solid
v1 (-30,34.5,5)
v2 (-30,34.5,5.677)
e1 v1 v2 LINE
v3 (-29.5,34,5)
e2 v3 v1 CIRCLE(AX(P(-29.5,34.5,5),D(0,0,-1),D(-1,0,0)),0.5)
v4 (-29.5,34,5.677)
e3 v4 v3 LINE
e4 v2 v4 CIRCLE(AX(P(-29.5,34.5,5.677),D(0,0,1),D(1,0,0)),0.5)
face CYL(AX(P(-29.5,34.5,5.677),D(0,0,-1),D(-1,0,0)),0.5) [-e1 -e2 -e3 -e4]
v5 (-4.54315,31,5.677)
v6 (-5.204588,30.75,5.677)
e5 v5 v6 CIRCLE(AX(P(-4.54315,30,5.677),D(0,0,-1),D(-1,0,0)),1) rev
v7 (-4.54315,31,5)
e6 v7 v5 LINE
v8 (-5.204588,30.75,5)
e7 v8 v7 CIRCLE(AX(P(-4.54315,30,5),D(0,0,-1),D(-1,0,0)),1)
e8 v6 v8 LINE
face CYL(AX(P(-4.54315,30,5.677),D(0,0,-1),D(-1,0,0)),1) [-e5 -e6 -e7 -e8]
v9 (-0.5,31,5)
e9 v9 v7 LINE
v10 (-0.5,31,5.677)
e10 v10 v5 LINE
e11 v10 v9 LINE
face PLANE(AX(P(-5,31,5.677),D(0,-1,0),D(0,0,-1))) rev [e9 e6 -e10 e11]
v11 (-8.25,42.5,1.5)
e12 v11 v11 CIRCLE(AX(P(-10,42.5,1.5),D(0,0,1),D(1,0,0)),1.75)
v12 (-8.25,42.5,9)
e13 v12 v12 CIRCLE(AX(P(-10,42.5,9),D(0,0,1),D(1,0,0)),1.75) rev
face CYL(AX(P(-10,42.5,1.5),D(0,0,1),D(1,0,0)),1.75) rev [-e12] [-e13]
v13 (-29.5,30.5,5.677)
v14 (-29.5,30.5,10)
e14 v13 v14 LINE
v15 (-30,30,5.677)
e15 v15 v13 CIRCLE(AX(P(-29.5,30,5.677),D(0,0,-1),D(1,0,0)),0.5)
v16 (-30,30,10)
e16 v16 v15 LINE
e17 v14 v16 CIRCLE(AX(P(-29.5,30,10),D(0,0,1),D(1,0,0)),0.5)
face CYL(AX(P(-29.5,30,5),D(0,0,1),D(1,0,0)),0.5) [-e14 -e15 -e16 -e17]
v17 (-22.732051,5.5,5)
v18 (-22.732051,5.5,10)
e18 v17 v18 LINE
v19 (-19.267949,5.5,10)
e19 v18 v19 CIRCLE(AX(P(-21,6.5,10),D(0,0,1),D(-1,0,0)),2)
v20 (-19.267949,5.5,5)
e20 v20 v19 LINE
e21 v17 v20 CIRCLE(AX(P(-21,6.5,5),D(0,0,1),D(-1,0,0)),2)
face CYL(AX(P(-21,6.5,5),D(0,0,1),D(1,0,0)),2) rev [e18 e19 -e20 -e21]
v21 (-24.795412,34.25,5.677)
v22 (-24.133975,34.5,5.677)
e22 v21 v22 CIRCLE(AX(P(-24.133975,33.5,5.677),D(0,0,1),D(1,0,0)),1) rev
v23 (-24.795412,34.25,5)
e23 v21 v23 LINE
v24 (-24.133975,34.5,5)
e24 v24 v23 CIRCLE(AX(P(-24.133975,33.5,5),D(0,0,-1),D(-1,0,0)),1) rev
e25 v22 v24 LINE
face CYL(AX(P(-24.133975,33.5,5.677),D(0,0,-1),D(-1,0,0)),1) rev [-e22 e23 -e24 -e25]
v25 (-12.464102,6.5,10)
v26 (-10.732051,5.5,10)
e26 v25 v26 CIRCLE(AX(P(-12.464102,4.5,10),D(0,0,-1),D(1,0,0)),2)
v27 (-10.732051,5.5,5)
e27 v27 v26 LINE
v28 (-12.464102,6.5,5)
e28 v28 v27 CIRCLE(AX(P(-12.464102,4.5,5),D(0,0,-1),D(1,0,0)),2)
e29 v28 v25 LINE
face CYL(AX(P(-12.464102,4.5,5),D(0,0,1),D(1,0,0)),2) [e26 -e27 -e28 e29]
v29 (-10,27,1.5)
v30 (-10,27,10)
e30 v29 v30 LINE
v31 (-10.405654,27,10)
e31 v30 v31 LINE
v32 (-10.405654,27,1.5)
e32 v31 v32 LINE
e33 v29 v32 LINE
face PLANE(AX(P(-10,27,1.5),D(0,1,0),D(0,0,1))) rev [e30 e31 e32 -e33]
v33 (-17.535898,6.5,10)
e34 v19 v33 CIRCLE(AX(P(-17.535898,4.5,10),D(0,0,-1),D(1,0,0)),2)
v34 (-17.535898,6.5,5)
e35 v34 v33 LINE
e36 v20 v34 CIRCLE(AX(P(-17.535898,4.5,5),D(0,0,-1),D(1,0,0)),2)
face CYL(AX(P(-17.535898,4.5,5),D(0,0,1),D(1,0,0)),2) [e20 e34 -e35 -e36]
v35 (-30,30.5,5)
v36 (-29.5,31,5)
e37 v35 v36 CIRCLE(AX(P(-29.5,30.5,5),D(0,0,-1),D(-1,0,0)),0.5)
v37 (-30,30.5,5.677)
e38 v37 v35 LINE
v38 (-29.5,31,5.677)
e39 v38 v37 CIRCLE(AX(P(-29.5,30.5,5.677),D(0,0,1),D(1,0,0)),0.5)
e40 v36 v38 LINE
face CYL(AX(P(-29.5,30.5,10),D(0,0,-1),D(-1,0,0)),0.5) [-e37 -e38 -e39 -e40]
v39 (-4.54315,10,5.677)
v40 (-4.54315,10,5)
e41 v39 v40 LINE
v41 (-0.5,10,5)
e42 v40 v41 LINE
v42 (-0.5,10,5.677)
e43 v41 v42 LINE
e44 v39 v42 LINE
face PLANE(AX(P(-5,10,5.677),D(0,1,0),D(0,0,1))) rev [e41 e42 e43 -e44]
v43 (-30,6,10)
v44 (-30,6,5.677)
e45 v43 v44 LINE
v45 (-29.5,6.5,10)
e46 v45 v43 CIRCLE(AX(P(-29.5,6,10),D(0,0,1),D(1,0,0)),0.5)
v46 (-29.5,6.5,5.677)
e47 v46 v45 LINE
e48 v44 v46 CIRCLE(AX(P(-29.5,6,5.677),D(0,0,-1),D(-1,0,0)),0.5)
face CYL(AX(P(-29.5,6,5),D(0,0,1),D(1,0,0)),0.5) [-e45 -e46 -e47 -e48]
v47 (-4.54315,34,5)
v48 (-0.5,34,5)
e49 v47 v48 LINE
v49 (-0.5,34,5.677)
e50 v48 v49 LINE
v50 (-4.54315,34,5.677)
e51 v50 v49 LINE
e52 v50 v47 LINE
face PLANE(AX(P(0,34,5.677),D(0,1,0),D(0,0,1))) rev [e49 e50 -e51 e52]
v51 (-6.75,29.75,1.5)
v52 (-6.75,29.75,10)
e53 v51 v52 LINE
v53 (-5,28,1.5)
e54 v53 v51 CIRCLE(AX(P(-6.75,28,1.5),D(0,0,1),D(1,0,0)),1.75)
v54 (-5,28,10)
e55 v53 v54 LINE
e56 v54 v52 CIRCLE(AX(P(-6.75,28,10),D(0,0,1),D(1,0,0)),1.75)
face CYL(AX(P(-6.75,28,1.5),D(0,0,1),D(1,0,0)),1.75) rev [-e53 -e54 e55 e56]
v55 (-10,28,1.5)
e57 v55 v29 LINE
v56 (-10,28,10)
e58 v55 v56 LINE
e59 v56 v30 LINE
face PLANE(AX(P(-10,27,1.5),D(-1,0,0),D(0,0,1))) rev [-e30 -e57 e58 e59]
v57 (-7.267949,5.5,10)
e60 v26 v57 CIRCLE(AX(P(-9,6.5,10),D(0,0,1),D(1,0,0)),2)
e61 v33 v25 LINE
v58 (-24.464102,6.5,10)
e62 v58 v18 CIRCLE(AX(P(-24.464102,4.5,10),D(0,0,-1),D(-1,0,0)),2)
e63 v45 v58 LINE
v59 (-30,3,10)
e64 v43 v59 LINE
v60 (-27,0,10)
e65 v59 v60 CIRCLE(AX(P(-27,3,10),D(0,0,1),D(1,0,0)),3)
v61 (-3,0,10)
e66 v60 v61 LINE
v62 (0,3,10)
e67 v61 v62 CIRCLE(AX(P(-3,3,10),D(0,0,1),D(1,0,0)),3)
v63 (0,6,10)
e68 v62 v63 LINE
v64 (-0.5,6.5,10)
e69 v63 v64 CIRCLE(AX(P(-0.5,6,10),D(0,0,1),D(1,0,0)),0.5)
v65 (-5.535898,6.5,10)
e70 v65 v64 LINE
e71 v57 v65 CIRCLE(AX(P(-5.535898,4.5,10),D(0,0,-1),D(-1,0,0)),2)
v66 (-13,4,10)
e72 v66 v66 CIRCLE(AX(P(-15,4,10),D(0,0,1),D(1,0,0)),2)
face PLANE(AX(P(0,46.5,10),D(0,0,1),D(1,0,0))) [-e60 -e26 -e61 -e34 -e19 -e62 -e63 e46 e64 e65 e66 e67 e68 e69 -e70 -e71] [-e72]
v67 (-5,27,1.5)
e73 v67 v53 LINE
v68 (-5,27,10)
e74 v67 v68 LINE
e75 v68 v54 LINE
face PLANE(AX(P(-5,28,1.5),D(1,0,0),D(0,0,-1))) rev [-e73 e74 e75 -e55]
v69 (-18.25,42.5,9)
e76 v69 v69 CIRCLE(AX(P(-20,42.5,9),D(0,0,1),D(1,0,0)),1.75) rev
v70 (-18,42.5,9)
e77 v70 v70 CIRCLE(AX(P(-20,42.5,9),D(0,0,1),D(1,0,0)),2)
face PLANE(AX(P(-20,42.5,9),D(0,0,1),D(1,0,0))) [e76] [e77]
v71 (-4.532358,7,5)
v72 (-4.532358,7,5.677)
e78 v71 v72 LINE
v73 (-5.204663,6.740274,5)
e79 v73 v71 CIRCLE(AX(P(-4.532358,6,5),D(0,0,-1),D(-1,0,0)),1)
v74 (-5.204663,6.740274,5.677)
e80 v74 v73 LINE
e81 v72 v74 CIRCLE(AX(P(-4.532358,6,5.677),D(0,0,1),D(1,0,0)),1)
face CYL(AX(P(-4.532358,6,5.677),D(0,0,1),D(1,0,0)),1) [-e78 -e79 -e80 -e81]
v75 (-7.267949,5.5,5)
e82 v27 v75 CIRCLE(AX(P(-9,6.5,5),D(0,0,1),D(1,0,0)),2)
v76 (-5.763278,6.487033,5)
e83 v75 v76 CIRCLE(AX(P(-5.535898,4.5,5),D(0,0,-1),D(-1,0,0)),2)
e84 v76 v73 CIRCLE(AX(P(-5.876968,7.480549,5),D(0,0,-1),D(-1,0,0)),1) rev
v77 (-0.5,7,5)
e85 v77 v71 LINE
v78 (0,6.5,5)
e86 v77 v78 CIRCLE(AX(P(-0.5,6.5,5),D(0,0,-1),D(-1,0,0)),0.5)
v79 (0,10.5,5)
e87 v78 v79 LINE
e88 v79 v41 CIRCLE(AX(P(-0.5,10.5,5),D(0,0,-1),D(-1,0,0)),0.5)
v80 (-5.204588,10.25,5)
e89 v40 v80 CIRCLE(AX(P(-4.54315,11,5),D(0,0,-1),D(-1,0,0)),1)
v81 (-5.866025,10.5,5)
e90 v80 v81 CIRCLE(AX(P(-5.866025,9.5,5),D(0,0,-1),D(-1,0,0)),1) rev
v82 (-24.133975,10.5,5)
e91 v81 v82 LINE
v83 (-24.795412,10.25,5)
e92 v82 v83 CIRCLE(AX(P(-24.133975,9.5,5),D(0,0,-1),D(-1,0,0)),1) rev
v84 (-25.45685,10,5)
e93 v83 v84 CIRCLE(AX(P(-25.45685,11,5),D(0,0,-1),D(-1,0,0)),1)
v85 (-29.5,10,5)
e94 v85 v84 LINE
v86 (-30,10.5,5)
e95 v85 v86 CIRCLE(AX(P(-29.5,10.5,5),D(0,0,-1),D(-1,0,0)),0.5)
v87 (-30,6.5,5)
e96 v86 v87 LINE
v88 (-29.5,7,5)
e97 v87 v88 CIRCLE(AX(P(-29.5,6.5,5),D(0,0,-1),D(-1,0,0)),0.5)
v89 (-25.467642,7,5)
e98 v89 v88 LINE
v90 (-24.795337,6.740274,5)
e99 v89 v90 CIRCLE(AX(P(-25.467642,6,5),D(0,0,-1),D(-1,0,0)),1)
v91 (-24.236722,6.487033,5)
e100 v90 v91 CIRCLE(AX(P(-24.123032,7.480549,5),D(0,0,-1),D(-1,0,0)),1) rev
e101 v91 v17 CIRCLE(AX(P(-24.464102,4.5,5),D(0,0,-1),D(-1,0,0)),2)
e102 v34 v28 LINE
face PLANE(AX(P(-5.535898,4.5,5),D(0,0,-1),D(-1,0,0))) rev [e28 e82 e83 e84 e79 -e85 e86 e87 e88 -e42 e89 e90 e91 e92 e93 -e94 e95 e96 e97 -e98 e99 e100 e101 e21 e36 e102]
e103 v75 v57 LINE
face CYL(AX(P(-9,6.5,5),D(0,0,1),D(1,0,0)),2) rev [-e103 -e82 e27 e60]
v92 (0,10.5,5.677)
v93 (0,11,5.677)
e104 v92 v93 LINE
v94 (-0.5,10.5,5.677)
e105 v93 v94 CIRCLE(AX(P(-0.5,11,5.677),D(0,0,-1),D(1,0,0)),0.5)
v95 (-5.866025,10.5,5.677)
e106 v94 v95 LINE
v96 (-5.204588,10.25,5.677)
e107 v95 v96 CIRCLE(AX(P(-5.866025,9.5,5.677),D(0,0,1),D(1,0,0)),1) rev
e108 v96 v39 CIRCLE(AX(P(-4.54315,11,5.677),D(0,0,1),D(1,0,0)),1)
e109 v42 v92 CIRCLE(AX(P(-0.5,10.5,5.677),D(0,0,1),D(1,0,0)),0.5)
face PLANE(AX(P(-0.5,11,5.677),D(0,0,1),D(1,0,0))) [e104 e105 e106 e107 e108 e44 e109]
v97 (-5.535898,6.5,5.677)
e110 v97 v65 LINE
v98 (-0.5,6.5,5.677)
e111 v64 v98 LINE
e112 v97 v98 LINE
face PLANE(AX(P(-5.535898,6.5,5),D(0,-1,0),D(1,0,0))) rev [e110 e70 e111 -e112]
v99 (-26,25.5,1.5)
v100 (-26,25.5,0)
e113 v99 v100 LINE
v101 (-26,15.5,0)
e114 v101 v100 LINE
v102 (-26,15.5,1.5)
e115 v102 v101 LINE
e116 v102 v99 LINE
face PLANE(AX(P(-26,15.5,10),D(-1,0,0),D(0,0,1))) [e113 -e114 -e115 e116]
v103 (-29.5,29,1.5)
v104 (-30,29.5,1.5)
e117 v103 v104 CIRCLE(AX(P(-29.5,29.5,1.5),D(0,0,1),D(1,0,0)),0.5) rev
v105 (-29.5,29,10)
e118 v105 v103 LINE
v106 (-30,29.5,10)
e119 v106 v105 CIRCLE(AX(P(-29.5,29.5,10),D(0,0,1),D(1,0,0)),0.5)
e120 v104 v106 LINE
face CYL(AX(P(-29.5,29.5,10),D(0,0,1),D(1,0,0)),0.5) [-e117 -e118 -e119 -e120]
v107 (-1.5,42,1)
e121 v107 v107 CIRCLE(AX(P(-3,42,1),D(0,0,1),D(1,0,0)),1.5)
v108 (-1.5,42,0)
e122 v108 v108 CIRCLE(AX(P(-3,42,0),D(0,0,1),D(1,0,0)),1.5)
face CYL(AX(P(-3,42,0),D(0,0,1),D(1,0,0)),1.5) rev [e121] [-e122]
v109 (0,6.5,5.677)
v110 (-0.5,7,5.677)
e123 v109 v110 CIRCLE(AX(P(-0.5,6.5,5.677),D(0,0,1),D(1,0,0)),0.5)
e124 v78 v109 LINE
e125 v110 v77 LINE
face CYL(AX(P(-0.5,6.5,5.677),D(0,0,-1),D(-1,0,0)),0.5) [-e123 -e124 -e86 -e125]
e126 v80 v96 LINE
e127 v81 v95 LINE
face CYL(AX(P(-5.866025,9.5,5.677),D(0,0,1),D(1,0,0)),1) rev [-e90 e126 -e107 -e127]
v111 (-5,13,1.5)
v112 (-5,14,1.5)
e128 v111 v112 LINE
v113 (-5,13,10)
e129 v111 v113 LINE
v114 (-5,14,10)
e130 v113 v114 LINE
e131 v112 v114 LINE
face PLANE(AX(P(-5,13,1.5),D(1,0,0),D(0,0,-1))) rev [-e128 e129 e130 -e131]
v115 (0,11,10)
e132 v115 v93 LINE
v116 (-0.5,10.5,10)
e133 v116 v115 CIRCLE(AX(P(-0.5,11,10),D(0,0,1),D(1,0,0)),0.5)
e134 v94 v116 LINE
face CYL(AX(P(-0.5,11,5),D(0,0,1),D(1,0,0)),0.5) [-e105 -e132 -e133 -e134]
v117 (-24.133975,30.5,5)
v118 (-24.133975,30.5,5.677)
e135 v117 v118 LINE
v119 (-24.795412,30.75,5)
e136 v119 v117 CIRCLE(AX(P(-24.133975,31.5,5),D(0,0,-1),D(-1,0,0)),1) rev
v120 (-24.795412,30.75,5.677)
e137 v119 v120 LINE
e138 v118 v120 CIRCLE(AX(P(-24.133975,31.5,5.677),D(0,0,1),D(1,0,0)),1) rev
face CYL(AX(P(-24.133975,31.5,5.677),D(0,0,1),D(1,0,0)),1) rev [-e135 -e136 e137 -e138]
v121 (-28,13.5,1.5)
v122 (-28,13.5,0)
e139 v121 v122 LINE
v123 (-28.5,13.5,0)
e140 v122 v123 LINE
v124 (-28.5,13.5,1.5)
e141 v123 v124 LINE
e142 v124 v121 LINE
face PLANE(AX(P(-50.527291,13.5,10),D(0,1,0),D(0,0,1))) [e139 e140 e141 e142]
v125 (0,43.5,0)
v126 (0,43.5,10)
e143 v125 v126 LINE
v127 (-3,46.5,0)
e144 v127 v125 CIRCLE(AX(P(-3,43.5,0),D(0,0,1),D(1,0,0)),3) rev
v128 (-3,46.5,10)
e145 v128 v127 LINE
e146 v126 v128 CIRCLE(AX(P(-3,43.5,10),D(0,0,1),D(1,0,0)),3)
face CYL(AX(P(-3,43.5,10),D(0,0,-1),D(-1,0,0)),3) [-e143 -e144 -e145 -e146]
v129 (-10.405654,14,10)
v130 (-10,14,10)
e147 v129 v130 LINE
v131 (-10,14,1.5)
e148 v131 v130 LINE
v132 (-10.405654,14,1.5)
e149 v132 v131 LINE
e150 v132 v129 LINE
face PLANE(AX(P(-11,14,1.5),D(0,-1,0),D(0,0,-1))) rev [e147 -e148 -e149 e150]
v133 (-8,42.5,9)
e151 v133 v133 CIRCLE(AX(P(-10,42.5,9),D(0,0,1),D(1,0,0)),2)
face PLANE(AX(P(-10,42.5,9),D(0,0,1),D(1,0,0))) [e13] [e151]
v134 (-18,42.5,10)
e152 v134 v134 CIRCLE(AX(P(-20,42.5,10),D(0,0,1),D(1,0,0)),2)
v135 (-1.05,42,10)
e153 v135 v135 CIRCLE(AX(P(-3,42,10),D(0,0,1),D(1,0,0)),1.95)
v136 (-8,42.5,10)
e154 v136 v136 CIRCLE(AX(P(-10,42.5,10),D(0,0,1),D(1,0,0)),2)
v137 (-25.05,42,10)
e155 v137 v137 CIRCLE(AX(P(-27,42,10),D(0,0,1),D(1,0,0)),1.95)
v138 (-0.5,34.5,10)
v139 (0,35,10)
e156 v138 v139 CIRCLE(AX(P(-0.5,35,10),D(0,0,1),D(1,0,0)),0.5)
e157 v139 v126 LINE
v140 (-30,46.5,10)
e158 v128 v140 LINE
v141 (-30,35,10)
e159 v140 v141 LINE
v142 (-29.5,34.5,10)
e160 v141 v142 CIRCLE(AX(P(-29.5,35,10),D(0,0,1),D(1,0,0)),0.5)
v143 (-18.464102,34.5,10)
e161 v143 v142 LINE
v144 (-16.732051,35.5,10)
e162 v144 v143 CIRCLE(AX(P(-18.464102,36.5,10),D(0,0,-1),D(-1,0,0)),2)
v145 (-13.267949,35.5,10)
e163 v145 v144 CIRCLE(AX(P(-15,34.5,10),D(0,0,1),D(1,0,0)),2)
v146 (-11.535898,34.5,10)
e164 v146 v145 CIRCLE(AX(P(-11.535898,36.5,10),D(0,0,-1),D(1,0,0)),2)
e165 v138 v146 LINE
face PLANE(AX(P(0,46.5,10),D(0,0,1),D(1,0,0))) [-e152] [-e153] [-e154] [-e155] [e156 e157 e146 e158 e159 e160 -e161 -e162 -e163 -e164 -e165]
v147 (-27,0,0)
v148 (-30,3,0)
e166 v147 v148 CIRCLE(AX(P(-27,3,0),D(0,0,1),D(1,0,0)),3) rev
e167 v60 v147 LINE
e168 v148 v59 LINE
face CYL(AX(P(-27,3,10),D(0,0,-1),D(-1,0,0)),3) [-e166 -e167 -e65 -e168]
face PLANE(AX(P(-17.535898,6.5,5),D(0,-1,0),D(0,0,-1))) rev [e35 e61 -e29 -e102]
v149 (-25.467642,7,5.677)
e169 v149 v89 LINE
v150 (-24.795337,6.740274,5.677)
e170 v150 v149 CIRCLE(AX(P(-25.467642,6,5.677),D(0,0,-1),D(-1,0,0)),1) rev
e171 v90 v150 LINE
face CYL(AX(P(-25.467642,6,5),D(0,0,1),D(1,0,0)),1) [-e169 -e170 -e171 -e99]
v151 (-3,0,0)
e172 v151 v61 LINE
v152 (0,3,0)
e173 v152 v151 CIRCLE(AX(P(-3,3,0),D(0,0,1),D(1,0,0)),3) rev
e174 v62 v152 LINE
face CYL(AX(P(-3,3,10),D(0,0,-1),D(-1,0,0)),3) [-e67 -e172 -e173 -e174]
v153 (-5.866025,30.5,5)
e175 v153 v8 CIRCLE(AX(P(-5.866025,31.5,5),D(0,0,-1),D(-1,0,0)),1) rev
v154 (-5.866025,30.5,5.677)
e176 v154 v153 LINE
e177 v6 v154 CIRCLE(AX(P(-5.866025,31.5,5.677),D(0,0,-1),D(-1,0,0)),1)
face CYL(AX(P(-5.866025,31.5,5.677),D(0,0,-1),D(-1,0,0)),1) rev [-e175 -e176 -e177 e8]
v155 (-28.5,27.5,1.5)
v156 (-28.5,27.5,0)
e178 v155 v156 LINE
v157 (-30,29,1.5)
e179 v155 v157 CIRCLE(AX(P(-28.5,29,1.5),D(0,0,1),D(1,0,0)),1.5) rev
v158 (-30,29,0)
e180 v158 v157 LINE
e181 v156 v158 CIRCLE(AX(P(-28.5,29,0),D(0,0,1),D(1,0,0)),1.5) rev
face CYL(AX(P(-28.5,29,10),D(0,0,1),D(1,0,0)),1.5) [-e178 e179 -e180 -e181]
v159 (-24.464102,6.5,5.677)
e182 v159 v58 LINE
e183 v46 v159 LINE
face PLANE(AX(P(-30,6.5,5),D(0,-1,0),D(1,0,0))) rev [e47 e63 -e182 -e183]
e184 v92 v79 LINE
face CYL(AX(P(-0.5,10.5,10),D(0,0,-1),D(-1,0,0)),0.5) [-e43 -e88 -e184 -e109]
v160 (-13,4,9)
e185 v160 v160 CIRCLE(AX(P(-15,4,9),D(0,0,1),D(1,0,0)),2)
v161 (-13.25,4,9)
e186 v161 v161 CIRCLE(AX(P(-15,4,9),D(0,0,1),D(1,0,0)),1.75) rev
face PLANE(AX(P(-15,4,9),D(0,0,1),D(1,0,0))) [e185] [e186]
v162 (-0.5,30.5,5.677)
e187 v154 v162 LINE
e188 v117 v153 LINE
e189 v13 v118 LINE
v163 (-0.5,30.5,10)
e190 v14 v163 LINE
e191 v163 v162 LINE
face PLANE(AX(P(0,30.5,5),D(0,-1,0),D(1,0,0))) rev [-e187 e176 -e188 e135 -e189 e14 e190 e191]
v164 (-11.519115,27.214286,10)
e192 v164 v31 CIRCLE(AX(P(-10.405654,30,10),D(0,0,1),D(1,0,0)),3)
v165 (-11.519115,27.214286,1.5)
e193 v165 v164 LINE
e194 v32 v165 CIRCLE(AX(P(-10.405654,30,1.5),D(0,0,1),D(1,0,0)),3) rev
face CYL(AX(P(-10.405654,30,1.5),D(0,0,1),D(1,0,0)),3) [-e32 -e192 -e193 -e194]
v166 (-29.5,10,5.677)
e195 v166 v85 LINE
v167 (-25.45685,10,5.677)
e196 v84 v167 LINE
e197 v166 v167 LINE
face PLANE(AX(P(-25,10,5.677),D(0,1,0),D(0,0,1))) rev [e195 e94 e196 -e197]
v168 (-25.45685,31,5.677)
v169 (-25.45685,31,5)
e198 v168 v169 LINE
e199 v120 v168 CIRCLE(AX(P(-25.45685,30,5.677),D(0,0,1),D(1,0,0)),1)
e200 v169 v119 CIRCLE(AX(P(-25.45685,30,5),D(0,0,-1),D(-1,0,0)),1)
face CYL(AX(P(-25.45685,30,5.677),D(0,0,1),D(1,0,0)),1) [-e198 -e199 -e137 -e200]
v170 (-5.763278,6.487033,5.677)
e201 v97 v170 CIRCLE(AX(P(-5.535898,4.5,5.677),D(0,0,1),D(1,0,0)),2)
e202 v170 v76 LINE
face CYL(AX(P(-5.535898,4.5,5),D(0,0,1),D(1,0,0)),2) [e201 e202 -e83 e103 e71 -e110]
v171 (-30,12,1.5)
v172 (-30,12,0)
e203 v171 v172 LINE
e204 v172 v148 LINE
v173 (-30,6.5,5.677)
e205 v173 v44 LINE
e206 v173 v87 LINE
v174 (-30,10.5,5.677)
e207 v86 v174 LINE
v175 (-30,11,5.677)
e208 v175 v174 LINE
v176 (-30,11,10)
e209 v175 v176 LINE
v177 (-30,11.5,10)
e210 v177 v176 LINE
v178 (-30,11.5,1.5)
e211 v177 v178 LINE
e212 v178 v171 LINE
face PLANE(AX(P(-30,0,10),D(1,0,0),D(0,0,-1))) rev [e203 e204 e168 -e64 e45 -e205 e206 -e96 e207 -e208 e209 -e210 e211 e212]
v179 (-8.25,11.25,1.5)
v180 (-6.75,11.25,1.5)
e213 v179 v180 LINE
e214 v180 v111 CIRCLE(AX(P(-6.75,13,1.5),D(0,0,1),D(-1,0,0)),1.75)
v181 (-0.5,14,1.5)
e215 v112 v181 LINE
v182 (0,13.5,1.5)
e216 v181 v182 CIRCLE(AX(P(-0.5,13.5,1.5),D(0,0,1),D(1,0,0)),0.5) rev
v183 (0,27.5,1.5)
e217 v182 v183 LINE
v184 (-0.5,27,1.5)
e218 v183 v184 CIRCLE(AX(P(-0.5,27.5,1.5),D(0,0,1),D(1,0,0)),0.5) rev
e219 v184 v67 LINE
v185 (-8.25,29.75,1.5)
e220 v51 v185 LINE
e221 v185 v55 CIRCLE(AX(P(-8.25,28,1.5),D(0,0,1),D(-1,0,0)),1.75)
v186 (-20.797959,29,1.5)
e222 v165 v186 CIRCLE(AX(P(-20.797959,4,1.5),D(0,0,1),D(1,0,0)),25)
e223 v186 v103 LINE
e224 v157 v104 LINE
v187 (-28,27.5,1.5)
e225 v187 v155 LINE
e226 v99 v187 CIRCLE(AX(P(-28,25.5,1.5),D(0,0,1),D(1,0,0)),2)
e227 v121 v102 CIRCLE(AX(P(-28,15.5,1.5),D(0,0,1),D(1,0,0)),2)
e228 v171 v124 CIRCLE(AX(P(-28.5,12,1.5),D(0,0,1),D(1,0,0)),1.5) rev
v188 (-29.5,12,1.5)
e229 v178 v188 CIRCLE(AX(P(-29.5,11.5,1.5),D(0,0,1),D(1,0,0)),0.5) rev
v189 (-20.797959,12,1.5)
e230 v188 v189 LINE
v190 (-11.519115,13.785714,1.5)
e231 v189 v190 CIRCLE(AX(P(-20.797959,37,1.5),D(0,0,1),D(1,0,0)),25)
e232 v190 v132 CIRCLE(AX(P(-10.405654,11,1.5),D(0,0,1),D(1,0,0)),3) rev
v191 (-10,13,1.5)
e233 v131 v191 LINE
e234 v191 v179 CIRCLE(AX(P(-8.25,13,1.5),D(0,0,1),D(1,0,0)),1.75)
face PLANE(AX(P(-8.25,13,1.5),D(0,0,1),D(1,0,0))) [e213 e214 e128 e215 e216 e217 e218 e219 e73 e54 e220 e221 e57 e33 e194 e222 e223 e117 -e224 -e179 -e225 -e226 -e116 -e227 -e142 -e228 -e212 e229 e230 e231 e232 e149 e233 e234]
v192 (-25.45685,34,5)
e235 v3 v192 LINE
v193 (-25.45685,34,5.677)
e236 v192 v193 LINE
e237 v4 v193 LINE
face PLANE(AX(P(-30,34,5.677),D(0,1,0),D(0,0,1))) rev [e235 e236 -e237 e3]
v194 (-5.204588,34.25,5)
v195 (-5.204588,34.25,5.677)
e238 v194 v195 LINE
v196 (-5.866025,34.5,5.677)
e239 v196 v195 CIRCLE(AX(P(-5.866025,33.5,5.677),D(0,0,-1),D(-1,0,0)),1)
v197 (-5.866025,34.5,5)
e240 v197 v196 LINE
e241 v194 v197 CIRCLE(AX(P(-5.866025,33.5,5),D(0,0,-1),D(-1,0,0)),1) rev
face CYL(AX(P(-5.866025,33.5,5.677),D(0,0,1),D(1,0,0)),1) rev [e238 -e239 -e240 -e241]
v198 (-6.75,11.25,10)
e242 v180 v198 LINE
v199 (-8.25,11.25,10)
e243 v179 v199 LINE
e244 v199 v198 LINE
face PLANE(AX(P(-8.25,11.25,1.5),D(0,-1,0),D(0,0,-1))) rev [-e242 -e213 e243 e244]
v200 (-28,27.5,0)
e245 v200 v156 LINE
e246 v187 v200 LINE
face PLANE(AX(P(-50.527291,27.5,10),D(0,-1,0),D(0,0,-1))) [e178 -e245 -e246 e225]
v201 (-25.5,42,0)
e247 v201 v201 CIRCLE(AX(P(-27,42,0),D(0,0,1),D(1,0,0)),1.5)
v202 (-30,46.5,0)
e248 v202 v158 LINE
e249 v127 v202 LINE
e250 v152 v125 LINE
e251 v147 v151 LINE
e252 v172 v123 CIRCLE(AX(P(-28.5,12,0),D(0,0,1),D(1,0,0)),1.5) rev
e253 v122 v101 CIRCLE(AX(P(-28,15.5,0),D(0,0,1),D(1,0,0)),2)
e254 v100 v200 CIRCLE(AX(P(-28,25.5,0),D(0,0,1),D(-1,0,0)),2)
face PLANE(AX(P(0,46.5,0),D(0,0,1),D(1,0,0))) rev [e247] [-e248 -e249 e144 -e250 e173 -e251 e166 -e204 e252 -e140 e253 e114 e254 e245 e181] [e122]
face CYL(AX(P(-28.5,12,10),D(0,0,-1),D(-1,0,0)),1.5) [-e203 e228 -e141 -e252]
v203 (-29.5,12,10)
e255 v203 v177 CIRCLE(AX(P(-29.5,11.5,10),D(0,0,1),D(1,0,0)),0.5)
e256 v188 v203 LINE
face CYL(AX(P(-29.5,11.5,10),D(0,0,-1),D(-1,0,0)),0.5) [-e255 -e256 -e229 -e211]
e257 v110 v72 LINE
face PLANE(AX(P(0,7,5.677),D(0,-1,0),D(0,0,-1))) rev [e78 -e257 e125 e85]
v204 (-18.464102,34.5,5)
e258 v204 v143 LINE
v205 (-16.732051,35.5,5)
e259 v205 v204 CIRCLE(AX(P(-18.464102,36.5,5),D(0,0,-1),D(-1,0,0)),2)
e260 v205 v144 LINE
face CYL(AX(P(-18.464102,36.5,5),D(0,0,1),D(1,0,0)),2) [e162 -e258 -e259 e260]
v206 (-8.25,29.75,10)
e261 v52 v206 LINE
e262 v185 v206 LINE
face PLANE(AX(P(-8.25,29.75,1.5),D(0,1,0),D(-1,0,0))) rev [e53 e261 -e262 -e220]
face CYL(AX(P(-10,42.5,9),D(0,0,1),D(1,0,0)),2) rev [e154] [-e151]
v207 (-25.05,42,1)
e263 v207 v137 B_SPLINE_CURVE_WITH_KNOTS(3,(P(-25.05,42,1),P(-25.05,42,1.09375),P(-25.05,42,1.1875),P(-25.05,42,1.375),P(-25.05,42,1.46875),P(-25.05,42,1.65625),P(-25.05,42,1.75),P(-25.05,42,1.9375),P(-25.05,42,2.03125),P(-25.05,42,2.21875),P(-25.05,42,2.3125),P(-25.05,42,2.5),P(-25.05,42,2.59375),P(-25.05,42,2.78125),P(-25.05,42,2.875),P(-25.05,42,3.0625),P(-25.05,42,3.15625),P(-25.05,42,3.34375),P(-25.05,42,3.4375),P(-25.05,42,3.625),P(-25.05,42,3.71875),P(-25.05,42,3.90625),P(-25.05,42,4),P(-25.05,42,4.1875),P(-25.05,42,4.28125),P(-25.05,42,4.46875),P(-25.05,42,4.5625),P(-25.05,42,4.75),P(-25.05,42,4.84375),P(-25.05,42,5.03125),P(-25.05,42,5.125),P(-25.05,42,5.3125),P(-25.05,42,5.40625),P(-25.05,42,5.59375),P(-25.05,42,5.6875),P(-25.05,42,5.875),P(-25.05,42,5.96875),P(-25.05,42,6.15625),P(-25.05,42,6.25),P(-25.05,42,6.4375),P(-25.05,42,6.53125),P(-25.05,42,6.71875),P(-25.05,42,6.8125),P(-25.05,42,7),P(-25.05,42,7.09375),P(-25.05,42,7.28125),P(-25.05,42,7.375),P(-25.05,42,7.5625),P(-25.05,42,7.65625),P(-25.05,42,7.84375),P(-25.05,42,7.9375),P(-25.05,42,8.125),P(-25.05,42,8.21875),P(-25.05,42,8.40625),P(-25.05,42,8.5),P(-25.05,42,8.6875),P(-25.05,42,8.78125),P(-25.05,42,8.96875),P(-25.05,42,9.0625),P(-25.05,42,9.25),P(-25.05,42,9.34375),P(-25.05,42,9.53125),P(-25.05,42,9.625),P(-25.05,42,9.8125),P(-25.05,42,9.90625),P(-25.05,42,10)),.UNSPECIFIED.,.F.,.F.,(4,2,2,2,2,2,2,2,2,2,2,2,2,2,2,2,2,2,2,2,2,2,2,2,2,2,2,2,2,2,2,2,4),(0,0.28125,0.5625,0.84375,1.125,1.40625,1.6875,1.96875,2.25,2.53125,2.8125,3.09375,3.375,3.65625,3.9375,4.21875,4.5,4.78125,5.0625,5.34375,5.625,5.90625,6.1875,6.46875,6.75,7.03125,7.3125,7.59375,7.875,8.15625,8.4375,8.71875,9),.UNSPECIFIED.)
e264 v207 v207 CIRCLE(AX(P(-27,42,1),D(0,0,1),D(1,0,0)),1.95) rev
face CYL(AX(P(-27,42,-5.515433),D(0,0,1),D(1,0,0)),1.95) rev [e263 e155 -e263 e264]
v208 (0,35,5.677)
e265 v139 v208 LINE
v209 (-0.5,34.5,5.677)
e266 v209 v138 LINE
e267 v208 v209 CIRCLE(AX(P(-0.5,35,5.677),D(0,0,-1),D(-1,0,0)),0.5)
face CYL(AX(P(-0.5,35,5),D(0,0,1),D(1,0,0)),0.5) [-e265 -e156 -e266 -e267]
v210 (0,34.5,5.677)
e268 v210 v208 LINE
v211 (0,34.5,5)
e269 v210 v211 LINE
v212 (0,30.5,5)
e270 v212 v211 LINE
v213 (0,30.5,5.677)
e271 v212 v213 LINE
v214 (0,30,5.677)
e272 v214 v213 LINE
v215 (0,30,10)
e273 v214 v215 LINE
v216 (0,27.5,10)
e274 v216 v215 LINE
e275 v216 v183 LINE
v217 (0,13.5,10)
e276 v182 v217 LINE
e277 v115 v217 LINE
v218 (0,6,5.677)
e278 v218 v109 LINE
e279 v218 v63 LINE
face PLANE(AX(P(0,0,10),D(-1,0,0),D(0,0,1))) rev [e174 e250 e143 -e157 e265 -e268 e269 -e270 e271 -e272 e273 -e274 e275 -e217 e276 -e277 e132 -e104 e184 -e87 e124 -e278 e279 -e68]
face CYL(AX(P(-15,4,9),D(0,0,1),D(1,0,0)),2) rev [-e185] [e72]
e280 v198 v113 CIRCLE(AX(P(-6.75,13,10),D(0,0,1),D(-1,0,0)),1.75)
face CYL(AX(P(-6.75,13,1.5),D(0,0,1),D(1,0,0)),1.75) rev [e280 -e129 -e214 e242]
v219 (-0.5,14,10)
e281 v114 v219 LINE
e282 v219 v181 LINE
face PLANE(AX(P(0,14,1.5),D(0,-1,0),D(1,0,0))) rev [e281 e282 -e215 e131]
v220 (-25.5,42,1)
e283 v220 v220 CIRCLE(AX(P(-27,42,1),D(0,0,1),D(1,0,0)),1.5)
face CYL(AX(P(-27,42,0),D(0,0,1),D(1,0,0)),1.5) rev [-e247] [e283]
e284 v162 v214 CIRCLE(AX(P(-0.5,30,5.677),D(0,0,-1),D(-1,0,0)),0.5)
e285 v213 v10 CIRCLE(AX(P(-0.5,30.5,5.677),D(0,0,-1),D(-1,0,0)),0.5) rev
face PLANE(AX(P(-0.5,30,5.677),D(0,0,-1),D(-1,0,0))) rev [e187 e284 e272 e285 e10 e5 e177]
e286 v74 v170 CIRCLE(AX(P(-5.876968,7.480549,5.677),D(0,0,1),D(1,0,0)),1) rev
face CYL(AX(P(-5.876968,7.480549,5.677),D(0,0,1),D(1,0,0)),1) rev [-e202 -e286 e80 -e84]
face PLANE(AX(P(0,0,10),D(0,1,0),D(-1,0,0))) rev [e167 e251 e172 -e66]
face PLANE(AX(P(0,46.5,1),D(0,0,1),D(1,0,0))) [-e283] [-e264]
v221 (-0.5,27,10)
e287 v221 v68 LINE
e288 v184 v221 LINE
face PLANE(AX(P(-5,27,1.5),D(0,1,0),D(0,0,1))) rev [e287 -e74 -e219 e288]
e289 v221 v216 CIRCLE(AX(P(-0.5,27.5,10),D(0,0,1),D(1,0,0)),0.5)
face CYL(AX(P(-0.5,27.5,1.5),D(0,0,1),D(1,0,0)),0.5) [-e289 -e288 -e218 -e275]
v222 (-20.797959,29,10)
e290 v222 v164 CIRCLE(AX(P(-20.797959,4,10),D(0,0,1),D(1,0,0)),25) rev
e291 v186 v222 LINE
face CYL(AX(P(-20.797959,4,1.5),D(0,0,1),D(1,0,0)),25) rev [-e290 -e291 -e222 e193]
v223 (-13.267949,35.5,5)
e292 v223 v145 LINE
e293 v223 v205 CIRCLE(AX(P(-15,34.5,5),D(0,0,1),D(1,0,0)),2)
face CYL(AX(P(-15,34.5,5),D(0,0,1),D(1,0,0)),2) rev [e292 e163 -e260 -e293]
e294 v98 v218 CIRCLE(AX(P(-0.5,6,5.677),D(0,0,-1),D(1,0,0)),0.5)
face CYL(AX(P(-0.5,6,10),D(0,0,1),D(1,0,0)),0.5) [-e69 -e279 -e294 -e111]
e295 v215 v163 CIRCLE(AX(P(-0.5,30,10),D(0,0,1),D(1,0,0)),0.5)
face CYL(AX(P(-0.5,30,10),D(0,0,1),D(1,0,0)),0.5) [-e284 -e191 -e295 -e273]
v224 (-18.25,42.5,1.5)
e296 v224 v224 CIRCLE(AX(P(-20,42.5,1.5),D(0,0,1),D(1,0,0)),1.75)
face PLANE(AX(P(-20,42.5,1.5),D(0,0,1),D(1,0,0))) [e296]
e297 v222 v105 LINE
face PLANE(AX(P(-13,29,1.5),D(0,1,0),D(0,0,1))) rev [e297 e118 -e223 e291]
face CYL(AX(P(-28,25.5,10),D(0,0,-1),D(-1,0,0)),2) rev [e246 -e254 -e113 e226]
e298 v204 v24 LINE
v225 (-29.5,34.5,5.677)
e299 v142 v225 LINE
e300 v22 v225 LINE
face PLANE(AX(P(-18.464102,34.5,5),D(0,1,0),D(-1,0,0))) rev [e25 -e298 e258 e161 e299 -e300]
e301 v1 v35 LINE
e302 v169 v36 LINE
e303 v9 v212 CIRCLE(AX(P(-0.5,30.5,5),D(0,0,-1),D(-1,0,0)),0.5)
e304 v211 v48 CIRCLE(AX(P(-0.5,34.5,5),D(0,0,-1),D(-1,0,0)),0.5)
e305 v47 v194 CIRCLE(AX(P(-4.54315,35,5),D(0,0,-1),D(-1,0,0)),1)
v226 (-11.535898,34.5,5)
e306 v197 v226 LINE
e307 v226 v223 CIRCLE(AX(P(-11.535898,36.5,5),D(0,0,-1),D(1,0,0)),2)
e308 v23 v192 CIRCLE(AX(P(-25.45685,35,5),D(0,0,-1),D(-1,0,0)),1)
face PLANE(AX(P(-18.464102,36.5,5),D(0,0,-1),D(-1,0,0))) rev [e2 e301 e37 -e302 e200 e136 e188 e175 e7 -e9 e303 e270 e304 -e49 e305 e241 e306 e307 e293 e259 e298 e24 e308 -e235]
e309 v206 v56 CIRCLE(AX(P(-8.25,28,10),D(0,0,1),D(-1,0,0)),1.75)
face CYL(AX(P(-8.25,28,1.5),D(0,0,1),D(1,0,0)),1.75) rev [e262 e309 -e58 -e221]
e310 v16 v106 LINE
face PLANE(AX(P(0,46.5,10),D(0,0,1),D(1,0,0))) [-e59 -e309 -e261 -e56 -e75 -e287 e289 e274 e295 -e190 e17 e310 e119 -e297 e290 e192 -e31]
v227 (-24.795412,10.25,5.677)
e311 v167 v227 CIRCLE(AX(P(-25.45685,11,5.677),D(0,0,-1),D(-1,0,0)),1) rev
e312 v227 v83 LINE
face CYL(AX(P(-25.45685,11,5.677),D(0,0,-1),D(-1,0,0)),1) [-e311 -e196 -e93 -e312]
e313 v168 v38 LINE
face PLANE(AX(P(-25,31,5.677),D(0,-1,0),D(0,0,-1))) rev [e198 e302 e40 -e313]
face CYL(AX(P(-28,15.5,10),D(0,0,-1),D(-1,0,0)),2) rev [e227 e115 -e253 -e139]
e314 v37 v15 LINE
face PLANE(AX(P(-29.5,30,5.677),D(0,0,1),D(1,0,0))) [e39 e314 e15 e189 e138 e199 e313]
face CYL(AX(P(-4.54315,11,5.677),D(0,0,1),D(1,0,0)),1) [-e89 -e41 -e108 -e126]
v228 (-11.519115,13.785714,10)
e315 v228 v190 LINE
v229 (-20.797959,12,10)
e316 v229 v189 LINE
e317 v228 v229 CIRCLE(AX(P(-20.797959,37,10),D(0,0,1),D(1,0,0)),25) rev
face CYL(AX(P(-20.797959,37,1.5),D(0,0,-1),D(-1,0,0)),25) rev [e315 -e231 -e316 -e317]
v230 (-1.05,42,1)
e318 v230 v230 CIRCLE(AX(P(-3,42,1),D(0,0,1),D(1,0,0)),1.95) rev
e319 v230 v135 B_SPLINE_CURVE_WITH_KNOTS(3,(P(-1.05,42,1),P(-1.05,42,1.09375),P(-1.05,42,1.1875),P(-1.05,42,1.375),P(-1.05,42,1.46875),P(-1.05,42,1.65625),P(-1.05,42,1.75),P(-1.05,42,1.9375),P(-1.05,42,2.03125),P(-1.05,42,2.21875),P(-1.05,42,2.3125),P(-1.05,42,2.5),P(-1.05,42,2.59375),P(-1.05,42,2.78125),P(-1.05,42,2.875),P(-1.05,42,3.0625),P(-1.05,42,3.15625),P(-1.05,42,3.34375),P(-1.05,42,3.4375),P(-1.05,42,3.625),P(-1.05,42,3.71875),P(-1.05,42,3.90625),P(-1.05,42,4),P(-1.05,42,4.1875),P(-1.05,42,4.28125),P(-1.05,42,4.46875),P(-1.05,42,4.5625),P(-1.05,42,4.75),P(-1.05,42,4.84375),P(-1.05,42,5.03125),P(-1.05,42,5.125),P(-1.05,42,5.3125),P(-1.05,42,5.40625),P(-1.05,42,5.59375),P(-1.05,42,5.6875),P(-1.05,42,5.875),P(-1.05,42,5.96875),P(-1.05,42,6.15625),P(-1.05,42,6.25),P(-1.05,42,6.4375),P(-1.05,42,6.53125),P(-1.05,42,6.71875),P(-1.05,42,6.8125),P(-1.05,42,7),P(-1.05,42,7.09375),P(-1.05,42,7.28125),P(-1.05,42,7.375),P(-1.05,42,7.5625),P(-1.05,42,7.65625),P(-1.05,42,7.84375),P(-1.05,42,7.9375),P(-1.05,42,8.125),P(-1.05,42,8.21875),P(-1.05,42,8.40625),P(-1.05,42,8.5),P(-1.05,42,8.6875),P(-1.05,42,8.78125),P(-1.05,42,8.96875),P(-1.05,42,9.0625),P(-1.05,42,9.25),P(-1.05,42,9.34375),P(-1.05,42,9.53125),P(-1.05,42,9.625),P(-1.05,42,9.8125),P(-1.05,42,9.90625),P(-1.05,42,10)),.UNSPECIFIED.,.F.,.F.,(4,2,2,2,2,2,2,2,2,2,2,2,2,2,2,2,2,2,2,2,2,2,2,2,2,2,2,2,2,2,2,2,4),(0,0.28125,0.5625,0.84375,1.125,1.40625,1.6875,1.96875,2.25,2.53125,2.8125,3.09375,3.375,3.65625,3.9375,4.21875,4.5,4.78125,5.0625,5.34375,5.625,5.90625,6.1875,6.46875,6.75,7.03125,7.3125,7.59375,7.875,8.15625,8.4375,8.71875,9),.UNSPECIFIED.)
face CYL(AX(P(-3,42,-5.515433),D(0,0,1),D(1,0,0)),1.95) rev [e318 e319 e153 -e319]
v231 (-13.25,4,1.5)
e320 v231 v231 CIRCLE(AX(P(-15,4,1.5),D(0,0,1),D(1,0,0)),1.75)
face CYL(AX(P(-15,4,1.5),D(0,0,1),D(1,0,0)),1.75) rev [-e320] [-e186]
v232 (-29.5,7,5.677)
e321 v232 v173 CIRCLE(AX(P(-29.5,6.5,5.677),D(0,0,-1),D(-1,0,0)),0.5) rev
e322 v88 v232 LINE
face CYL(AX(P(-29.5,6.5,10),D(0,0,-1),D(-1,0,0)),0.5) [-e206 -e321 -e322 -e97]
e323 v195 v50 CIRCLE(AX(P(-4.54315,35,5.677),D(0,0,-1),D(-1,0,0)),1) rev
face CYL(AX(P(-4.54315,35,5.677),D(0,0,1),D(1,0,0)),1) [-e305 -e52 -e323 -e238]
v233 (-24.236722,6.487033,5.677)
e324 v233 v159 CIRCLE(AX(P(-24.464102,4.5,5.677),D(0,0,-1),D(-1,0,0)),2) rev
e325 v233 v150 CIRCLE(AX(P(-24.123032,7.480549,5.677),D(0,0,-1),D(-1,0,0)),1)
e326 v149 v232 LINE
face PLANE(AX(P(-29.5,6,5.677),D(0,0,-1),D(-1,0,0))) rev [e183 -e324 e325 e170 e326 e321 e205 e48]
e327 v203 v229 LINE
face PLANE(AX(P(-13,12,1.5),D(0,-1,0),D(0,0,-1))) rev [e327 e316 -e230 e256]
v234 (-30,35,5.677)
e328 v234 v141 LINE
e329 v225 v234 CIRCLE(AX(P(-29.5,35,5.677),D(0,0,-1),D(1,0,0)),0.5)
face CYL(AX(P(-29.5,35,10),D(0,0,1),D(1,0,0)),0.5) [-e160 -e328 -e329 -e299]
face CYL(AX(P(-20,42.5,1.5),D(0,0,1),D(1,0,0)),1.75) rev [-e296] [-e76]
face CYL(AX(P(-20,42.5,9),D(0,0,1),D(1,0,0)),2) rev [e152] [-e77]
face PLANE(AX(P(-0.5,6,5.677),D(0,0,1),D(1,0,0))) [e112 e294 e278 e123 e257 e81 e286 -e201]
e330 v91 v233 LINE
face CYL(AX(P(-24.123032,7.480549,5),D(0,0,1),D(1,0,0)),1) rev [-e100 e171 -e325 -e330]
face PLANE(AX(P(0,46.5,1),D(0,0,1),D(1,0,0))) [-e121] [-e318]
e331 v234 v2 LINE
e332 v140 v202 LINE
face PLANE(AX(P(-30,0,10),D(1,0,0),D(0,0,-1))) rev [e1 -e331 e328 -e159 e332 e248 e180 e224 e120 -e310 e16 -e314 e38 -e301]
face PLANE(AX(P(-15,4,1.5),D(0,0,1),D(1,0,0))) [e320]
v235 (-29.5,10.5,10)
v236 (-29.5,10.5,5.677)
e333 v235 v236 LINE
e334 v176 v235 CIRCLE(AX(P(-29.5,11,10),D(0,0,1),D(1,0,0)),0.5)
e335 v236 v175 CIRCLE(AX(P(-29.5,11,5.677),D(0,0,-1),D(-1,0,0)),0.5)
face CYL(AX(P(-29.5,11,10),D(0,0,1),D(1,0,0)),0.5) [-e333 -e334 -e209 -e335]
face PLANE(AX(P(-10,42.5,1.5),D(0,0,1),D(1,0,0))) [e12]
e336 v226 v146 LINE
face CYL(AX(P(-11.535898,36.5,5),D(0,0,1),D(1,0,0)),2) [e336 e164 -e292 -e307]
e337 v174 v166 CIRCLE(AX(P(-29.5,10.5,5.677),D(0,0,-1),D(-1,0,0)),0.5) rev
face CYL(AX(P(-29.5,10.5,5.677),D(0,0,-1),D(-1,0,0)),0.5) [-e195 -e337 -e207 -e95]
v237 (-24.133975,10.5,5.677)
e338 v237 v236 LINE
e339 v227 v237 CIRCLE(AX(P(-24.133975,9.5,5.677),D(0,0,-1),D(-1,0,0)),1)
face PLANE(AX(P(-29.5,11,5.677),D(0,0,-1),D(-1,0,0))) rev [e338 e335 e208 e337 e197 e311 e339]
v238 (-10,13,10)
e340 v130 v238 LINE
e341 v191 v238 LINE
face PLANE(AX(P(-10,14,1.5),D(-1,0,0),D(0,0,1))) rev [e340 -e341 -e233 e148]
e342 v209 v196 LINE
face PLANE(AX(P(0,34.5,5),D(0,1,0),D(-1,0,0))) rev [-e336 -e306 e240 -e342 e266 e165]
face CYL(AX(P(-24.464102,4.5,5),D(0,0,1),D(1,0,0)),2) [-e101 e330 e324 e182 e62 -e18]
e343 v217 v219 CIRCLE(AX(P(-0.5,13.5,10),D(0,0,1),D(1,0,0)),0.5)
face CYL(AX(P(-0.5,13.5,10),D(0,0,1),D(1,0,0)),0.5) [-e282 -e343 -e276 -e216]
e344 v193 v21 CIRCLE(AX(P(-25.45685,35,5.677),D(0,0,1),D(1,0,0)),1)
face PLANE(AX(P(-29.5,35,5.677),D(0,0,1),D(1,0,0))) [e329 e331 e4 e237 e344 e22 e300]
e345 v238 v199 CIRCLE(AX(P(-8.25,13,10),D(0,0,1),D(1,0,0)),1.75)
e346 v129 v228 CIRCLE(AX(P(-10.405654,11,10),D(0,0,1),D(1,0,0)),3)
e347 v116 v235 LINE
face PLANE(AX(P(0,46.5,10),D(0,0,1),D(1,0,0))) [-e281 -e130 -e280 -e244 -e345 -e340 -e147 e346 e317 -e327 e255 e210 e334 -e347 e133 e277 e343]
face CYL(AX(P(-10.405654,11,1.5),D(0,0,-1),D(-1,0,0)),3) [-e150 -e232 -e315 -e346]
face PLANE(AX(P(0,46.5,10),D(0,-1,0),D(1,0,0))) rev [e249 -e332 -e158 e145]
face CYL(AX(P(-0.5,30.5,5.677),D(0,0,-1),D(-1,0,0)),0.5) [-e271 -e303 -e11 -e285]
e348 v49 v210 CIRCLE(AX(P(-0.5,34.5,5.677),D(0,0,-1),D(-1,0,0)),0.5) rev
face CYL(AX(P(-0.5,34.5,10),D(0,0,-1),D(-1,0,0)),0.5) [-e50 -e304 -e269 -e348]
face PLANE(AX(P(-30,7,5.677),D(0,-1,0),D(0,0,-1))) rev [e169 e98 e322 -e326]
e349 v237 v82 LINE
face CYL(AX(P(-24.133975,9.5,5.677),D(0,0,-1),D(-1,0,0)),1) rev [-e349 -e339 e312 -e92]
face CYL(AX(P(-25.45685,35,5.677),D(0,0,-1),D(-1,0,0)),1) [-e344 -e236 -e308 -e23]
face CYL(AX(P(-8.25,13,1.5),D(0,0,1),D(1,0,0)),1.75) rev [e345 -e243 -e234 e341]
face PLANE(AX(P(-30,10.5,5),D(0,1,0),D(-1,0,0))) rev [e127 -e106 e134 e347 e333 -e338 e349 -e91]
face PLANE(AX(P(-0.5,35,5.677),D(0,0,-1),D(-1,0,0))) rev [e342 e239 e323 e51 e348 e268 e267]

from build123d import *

# Parameters (mm, degrees)
SKETCH6_W           = 30
SKETCH6_H           = 46.5
BOSS_EXTRUDE3_DEPTH = 10
CUT_EXTRUDE2_DEPTH  = 57.233886581
SKETCH9_R           = 1.95
CUT_EXTRUDE4_DEPTH  = 9
FILLET1_R           = 1.5
CUT_EXTRUDE24_DEPTH = 5
FILLET13_R          = 3
CUT_EXTRUDE26_DEPTH = 8.5
FILLET14_R          = 25
SKETCH37_R          = 1.75
CUT_EXTRUDE27_DEPTH = 8.5
SKETCH38_R          = 2
CUT_EXTRUDE28_DEPTH = 1
FILLET15_R          = 0.5
FILLET16_R          = 0.5
FILLET17_R          = 3
SKETCH39_R          = 1.5
CUT_EXTRUDE29_DEPTH = 57.064694773
BOSS_EXTRUDE4_DEPTH = 0.677
FILLET18_R          = 1
FILLET19_R          = 1
FILLET20_R          = 0.5


with BuildPart() as part:
    # Sketch6 → Boss-Extrude3 (new body)
    with BuildSketch(Plane.XY):
        with Locations((-15, 23.25)):
            Rectangle(SKETCH6_W, SKETCH6_H)
    extrude(amount=BOSS_EXTRUDE3_DEPTH)

    # Sketch7 → Cut-Extrude2 (cut, through all)
    with BuildSketch(Plane.XY):
        with BuildLine():
            Line((-50.52729134, 13.5), (-28, 13.5))
            ThreePointArc((-28, 13.5), (-26.585786438, 14.085786438), (-26, 15.5))
            Line((-26, 15.5), (-26, 25.5))
            ThreePointArc((-26, 25.5), (-26.585786438, 26.914213562), (-28, 27.5))
            Line((-28, 27.5), (-50.52729134, 27.5))
            Line((-50.52729134, 27.5), (-50.52729134, 13.5))
        make_face()
    extrude(amount=CUT_EXTRUDE2_DEPTH, mode=Mode.SUBTRACT)

    # Sketch9 → Cut-Extrude4 (cut)
    with BuildSketch(Plane.XY.offset(10)):
        with Locations((-3, 42)):
            Circle(SKETCH9_R)
        with Locations((-27, 42)):
            Circle(SKETCH9_R)
    extrude(amount=-CUT_EXTRUDE4_DEPTH, mode=Mode.SUBTRACT)

    # Fillet1
    fillet1_edges = [part.edges().sort_by_distance(p)[0] for p in [
        (-30, 13.5, 5),
        (-30, 27.5, 5),
    ]]
    fillet(fillet1_edges, radius=FILLET1_R)

    # Sketch33 → Cut-Extrude24 (cut)
    with BuildSketch(Plane.XY.offset(10)):
        with BuildLine():
            Line((0, 34.5), (-11.535898385, 34.5))
            ThreePointArc((-11.535898385, 34.5), (-12.535898385, 34.767949192), (-13.267949192, 35.5))
            ThreePointArc((-13.267949192, 35.5), (-15, 36.5), (-16.732050808, 35.5))
            ThreePointArc((-16.732050808, 35.5), (-17.464101615, 34.767949192), (-18.464101615, 34.5))
            Line((-18.464101615, 34.5), (-30, 34.5))
            Line((-30, 34.5), (-30, 30.5))
            Line((-30, 30.5), (0, 30.5))
            Line((0, 30.5), (0, 34.5))
        make_face()
        with BuildLine():
            Line((-30, 10.5), (-30, 6.5))
            Line((-30, 6.5), (-24.464101615, 6.5))
            ThreePointArc((-24.464101615, 6.5), (-23.464101615, 6.232050808), (-22.732050808, 5.5))
            ThreePointArc((-22.732050808, 5.5), (-21, 4.5), (-19.267949192, 5.5))
            ThreePointArc((-19.267949192, 5.5), (-18.535898385, 6.232050808), (-17.535898385, 6.5))
            Line((-17.535898385, 6.5), (-12.464101615, 6.5))
            ThreePointArc((-12.464101615, 6.5), (-11.464101615, 6.232050808), (-10.732050808, 5.5))
            ThreePointArc((-10.732050808, 5.5), (-9, 4.5), (-7.267949192, 5.5))
            ThreePointArc((-7.267949192, 5.5), (-6.535898385, 6.232050808), (-5.535898385, 6.5))
            Line((-5.535898385, 6.5), (0, 6.5))
            Line((0, 6.5), (0, 10.5))
            Line((0, 10.5), (-30, 10.5))
        make_face()
    extrude(amount=-CUT_EXTRUDE24_DEPTH, mode=Mode.SUBTRACT)

    # Fillet13
    fillet13_edges = [part.edges().sort_by_distance(p)[0] for p in [
        (0, 0, 5),
        (-30, 0, 5),
        (0, 46.5, 5),
    ]]
    fillet(fillet13_edges, radius=FILLET13_R)

    # Sketch36 → Cut-Extrude26 (cut)
    with BuildSketch(Plane.XY.offset(10)):
        with BuildLine():
            Line((-10, 14), (-10, 13))
            ThreePointArc((-10, 13), (-9.487436867, 11.762563133), (-8.25, 11.25))
            Line((-8.25, 11.25), (-6.75, 11.25))
            ThreePointArc((-6.75, 11.25), (-5.512563133, 11.762563133), (-5, 13))
            Line((-5, 13), (-5, 14))
            Line((-5, 14), (0, 14))
            Line((0, 14), (0, 27))
            Line((0, 27), (-5, 27))
            Line((-5, 27), (-5, 28))
            ThreePointArc((-5, 28), (-5.512563133, 29.237436867), (-6.75, 29.75))
            Line((-6.75, 29.75), (-8.25, 29.75))
            ThreePointArc((-8.25, 29.75), (-9.487436867, 29.237436867), (-10, 28))
            Line((-10, 28), (-10, 27))
            Line((-10, 27), (-11, 27))
            Line((-11, 27), (-13, 29))
            Line((-13, 29), (-30, 29))
            Line((-30, 29), (-30, 12))
            Line((-30, 12), (-13, 12))
            Line((-13, 12), (-11, 14))
            Line((-11, 14), (-10, 14))
        make_face()
    extrude(amount=-CUT_EXTRUDE26_DEPTH, mode=Mode.SUBTRACT)

    # Fillet14
    # the kernel refuses this fillet: 25 mm, written as the material it adds along each edge
    with BuildSketch(Plane(origin=(-13, 12, 10), x_dir=(-1, 0, 0), z_dir=(0, 0, -1))) as fillet14_piece_1:
        with BuildLine():
            CenterArc((7.797958971, 25), FILLET14_R, 246.926081934, 23.073918066)
            Line((-2, 2), (-2.195959179, 1.54))
            ThreePointArc((-2.195959179, 1.54), (-1.353553391, 0.646446609), (-0.353553391, -0.353553391))
            Line((-0.353553391, -0.353553391), (0, -0.5))
            Line((0, -0.5), (7.797958971, -0.5))
            Line((7.797958971, -0.5), (7.797958971, 0))
        make_face()
    extrude(amount=8.5)
    with BuildSketch(Plane(origin=(-13, 29, 10), x_dir=(-1, 0, 0), z_dir=(0, 0, -1))) as fillet14_piece_2:
        with BuildLine():
            CenterArc((7.797958971, -25), FILLET14_R, 90, 23.073918066)
            Line((-2, -2), (-2.195959179, -1.54))
            ThreePointArc((-2.195959179, -1.54), (-1.353553391, -0.646446609), (-0.353553391, 0.353553391))
            Line((-0.353553391, 0.353553391), (0, 0.5))
            Line((0, 0.5), (7.797958971, 0.5))
            Line((7.797958971, 0.5), (7.797958971, 0))
        make_face()
    extrude(amount=8.5)

    # Sketch37 → Cut-Extrude27 (cut)
    with BuildSketch(Plane.XY.offset(10)):
        with Locations((-20, 42.5)):
            Circle(SKETCH37_R)
        with Locations((-10, 42.5)):
            Circle(SKETCH37_R)
        with Locations((-15, 4)):
            Circle(SKETCH37_R)
    extrude(amount=-CUT_EXTRUDE27_DEPTH, mode=Mode.SUBTRACT)

    # Sketch38 → Cut-Extrude28 (cut)
    with BuildSketch(Plane.XY.offset(10)):
        with Locations((-20, 42.5)):
            Circle(SKETCH38_R)
        with Locations((-10, 42.5)):
            Circle(SKETCH38_R)
        with Locations((-15, 4)):
            Circle(SKETCH38_R)
    extrude(amount=-CUT_EXTRUDE28_DEPTH, mode=Mode.SUBTRACT)

    # Fillet15
    fillet15_edges = [part.edges().sort_by_distance(p)[0] for p in [
        (0, 34.5, 7.5),
        (0, 30.5, 7.5),
        (-30, 30.5, 7.5),
        (-30, 34.5, 7.5),
        (-30, 10.5, 7.5),
        (0, 10.5, 7.5),
        (0, 6.5, 7.5),
        (-30, 6.5, 7.5),
    ]]
    fillet(fillet15_edges, radius=FILLET15_R)

    # Fillet16
    fillet16_edges = [part.edges().sort_by_distance(p)[0] for p in [
        (0, 27, 5.75),
        (0, 14, 5.75),
        (-30, 29, 5.75),
        (-30, 12, 5.75),
    ]]
    fillet(fillet16_edges, radius=FILLET16_R)

    # Fillet17
    fillet17_edges = [part.edges().sort_by_distance(p)[0] for p in [
        (-11, 27, 5.75),
        (-11, 14, 5.75),
    ]]
    fillet(fillet17_edges, radius=FILLET17_R)

    # Sketch39 → Cut-Extrude29 (cut, through all)
    with BuildSketch(Plane.XY.offset(1)):
        with Locations((-27, 42)):
            Circle(SKETCH39_R)
        with Locations((-3, 42)):
            Circle(SKETCH39_R)
    extrude(amount=-CUT_EXTRUDE29_DEPTH, mode=Mode.SUBTRACT)

    # Sketch40 → Boss-Extrude4 (add)
    with BuildSketch(Plane.XY.offset(5)):
        with BuildLine():
            Line((0, 34), (-5, 34))
            Line((-5, 34), (-5, 34.5))
            Line((-5, 34.5), (-0.5, 34.5))
            ThreePointArc((-0.5, 34.5), (-0.146446609, 34.646446609), (0, 35))
            Line((0, 35), (0, 34))
        make_face()
        with BuildLine():
            Line((-5, 30.5), (-5, 31))
            Line((-5, 31), (0, 31))
            Line((0, 31), (0, 30))
            ThreePointArc((0, 30), (-0.146446609, 30.353553391), (-0.5, 30.5))
            Line((-0.5, 30.5), (-5, 30.5))
        make_face()
        with BuildLine():
            Line((-25, 30.5), (-29.5, 30.5))
            ThreePointArc((-29.5, 30.5), (-29.853553391, 30.353553391), (-30, 30))
            Line((-30, 30), (-30, 31))
            Line((-30, 31), (-25, 31))
            Line((-25, 31), (-25, 30.5))
        make_face()
        with BuildLine():
            Line((-30, 35), (-30, 34))
            Line((-30, 34), (-25, 34))
            Line((-25, 34), (-25, 34.5))
            Line((-25, 34.5), (-29.5, 34.5))
            ThreePointArc((-29.5, 34.5), (-29.853553391, 34.646446609), (-30, 35))
        make_face()
        with BuildLine():
            Line((-5, 10.5), (-0.5, 10.5))
            ThreePointArc((-0.5, 10.5), (-0.146446609, 10.646446609), (0, 11))
            Line((0, 11), (0, 10))
            Line((0, 10), (-5, 10))
            Line((-5, 10), (-5, 10.5))
        make_face()
        with BuildLine():
            Line((0, 6), (0, 7))
            Line((0, 7), (-5, 7))
            Line((-5, 7), (-5, 6.5))
            Line((-5, 6.5), (-0.5, 6.5))
            ThreePointArc((-0.5, 6.5), (-0.146446609, 6.353553391), (0, 6))
        make_face()
        with BuildLine():
            Line((-30, 7), (-25, 7))
            Line((-25, 7), (-25, 6.5))
            Line((-25, 6.5), (-29.5, 6.5))
            ThreePointArc((-29.5, 6.5), (-29.853553391, 6.353553391), (-30, 6))
            Line((-30, 6), (-30, 7))
        make_face()
        with BuildLine():
            Line((-25, 10.5), (-25, 10))
            Line((-25, 10), (-30, 10))
            Line((-30, 10), (-30, 11))
            ThreePointArc((-30, 11), (-29.853553391, 10.646446609), (-29.5, 10.5))
            Line((-29.5, 10.5), (-25, 10.5))
        make_face()
    extrude(amount=BOSS_EXTRUDE4_DEPTH)

    # Fillet18
    # the kernel refuses this fillet: 1 mm, written as the material it adds along each edge
    with BuildSketch(Plane(origin=(-5, 6.5, 3.091529401), x_dir=(0, 1, 0), z_dir=(0, 0, 1))) as fillet18_piece_1:
        with BuildLine():
            CenterArc((0.980548867, 0.87696795), FILLET18_R, 186.528063675, 54.750680775)
            Line((-0.012967422, 0.763278095), (-0.112319051, 0.75190911))
            ThreePointArc((-0.112319051, 0.75190911), (-0.1, 0.535898385), (-0.1, 0))
            Line((-0.1, 0), (0, -0.1))
            ThreePointArc((0, -0.1), (0.25, -0.1), (0.451945113, -0.087696795))
            Line((0.451945113, -0.087696795), (0.5, 0))
        make_face()
    extrude(amount=2.585470599)
    with BuildSketch(Plane(origin=(-5, 10.5, 2.834936491), x_dir=(-1, 0, 0), z_dir=(0, 0, 1)), Plane(origin=(-25, 30.5, 2.834936491), x_dir=(1, 0, 0), z_dir=(0, 0, 1))) as fillet18_piece_2:
        with BuildLine():
            CenterArc((0.866025404, 1), FILLET18_R, 210, 60)
            Line((0, 0.5), (-0.017320508, 0.49))
            ThreePointArc((-0.017320508, 0.49), (-0.02, 0.25), (-0.02, 0))
            Line((-0.02, 0), (0, -0.02))
            Line((0, -0.02), (0.866025404, -0.02))
            Line((0.866025404, -0.02), (0.866025404, 0))
        make_face()
    extrude(amount=2.842063509)
    with BuildSketch(Plane(origin=(-25, 6.5, 3.091529401), x_dir=(0.9998557161664758, -0.016986666807342152, 0), z_dir=(0, 0, 1))) as fillet18_piece_3:
        with BuildLine():
            CenterArc((0.860185161, 0.995304153), FILLET18_R, 209.694566678, 54.750680775)
            Line((-0.008493333, 0.499927858), (-0.095361183, 0.450390229))
            ThreePointArc((-0.095361183, 0.450390229), (-0.104232238, 0.248265262), (-0.099985572, -0.001698667))
            Line((-0.099985572, -0.001698667), (0.001698667, -0.099985572))
            ThreePointArc((0.001698667, -0.099985572), (0.53751973, -0.090882444), (0.753708548, -0.099530415))
            Line((0.753708548, -0.099530415), (0.76338824, 0))
        make_face()
    extrude(amount=2.585470599)
    with BuildSketch(Plane(origin=(-25, 10.5, 2.834936491), x_dir=(1, 0, 0), z_dir=(0, 0, 1)), Plane(origin=(-5, 30.5, 2.834936491), x_dir=(-1, 0, 0), z_dir=(0, 0, 1))) as fillet18_piece_4:
        with BuildLine():
            CenterArc((0.866025404, -1), FILLET18_R, 90, 60)
            Line((0, -0.5), (-0.017320508, -0.49))
            ThreePointArc((-0.017320508, -0.49), (-0.02, -0.25), (-0.02, 0))
            Line((-0.02, 0), (0, 0.02))
            Line((0, 0.02), (0.866025404, 0.02))
            Line((0.866025404, 0.02), (0.866025404, 0))
        make_face()
    extrude(amount=2.842063509)
    with BuildSketch(Plane(origin=(-25, 34.5, 2.834936491), x_dir=(0, -1, 0), z_dir=(0, 0, 1))) as fillet18_piece_5:
        with BuildLine():
            CenterArc((1, 0.866025404), FILLET18_R, 180, 60)
            Line((0, 0.866025404), (-0.02, 0.866025404))
            Line((-0.02, 0.866025404), (-0.02, 0))
            Line((-0.02, 0), (0, -0.02))
            ThreePointArc((0, -0.02), (0.25, -0.02), (0.49, -0.017320508))
            Line((0.49, -0.017320508), (0.5, 0))
        make_face()
    extrude(amount=2.842063509)
    with BuildSketch(Plane(origin=(-5, 34.5, 2.834936491), x_dir=(0, -1, 0), z_dir=(0, 0, 1))) as fillet18_piece_6:
        with BuildLine():
            CenterArc((1, -0.866025404), FILLET18_R, 120, 60)
            Line((0, -0.866025404), (-0.02, -0.866025404))
            Line((-0.02, -0.866025404), (-0.02, 0))
            Line((-0.02, 0), (0, 0.02))
            ThreePointArc((0, 0.02), (0.25, 0.02), (0.49, 0.017320508))
            Line((0.49, 0.017320508), (0.5, 0))
        make_face()
    extrude(amount=2.842063509)

    # Fillet19
    fillet19_edges = [part.edges().sort_by_distance(p)[0] for p in [
        (-5, 34, 5.3385),
        (-5, 31, 5.3385),
        (-25, 31, 5.3385),
        (-25, 34, 5.3385),
        (-5, 10, 5.3385),
        (-5, 7, 5.3385),
        (-25, 7, 5.3385),
        (-25, 10, 5.3385),
    ]]
    fillet(fillet19_edges, radius=FILLET19_R)

    # Fillet20
    fillet20_edges = [part.edges().sort_by_distance(p)[0] for p in [
        (0, 34, 5.3385),
        (0, 31, 5.3385),
        (-30, 31, 5.3385),
        (-30, 34, 5.3385),
        (0, 10, 5.3385),
        (0, 7, 5.3385),
        (-30, 7, 5.3385),
        (-30, 10, 5.3385),
    ]]
    fillet(fillet20_edges, radius=FILLET20_R)


solid = part.part
